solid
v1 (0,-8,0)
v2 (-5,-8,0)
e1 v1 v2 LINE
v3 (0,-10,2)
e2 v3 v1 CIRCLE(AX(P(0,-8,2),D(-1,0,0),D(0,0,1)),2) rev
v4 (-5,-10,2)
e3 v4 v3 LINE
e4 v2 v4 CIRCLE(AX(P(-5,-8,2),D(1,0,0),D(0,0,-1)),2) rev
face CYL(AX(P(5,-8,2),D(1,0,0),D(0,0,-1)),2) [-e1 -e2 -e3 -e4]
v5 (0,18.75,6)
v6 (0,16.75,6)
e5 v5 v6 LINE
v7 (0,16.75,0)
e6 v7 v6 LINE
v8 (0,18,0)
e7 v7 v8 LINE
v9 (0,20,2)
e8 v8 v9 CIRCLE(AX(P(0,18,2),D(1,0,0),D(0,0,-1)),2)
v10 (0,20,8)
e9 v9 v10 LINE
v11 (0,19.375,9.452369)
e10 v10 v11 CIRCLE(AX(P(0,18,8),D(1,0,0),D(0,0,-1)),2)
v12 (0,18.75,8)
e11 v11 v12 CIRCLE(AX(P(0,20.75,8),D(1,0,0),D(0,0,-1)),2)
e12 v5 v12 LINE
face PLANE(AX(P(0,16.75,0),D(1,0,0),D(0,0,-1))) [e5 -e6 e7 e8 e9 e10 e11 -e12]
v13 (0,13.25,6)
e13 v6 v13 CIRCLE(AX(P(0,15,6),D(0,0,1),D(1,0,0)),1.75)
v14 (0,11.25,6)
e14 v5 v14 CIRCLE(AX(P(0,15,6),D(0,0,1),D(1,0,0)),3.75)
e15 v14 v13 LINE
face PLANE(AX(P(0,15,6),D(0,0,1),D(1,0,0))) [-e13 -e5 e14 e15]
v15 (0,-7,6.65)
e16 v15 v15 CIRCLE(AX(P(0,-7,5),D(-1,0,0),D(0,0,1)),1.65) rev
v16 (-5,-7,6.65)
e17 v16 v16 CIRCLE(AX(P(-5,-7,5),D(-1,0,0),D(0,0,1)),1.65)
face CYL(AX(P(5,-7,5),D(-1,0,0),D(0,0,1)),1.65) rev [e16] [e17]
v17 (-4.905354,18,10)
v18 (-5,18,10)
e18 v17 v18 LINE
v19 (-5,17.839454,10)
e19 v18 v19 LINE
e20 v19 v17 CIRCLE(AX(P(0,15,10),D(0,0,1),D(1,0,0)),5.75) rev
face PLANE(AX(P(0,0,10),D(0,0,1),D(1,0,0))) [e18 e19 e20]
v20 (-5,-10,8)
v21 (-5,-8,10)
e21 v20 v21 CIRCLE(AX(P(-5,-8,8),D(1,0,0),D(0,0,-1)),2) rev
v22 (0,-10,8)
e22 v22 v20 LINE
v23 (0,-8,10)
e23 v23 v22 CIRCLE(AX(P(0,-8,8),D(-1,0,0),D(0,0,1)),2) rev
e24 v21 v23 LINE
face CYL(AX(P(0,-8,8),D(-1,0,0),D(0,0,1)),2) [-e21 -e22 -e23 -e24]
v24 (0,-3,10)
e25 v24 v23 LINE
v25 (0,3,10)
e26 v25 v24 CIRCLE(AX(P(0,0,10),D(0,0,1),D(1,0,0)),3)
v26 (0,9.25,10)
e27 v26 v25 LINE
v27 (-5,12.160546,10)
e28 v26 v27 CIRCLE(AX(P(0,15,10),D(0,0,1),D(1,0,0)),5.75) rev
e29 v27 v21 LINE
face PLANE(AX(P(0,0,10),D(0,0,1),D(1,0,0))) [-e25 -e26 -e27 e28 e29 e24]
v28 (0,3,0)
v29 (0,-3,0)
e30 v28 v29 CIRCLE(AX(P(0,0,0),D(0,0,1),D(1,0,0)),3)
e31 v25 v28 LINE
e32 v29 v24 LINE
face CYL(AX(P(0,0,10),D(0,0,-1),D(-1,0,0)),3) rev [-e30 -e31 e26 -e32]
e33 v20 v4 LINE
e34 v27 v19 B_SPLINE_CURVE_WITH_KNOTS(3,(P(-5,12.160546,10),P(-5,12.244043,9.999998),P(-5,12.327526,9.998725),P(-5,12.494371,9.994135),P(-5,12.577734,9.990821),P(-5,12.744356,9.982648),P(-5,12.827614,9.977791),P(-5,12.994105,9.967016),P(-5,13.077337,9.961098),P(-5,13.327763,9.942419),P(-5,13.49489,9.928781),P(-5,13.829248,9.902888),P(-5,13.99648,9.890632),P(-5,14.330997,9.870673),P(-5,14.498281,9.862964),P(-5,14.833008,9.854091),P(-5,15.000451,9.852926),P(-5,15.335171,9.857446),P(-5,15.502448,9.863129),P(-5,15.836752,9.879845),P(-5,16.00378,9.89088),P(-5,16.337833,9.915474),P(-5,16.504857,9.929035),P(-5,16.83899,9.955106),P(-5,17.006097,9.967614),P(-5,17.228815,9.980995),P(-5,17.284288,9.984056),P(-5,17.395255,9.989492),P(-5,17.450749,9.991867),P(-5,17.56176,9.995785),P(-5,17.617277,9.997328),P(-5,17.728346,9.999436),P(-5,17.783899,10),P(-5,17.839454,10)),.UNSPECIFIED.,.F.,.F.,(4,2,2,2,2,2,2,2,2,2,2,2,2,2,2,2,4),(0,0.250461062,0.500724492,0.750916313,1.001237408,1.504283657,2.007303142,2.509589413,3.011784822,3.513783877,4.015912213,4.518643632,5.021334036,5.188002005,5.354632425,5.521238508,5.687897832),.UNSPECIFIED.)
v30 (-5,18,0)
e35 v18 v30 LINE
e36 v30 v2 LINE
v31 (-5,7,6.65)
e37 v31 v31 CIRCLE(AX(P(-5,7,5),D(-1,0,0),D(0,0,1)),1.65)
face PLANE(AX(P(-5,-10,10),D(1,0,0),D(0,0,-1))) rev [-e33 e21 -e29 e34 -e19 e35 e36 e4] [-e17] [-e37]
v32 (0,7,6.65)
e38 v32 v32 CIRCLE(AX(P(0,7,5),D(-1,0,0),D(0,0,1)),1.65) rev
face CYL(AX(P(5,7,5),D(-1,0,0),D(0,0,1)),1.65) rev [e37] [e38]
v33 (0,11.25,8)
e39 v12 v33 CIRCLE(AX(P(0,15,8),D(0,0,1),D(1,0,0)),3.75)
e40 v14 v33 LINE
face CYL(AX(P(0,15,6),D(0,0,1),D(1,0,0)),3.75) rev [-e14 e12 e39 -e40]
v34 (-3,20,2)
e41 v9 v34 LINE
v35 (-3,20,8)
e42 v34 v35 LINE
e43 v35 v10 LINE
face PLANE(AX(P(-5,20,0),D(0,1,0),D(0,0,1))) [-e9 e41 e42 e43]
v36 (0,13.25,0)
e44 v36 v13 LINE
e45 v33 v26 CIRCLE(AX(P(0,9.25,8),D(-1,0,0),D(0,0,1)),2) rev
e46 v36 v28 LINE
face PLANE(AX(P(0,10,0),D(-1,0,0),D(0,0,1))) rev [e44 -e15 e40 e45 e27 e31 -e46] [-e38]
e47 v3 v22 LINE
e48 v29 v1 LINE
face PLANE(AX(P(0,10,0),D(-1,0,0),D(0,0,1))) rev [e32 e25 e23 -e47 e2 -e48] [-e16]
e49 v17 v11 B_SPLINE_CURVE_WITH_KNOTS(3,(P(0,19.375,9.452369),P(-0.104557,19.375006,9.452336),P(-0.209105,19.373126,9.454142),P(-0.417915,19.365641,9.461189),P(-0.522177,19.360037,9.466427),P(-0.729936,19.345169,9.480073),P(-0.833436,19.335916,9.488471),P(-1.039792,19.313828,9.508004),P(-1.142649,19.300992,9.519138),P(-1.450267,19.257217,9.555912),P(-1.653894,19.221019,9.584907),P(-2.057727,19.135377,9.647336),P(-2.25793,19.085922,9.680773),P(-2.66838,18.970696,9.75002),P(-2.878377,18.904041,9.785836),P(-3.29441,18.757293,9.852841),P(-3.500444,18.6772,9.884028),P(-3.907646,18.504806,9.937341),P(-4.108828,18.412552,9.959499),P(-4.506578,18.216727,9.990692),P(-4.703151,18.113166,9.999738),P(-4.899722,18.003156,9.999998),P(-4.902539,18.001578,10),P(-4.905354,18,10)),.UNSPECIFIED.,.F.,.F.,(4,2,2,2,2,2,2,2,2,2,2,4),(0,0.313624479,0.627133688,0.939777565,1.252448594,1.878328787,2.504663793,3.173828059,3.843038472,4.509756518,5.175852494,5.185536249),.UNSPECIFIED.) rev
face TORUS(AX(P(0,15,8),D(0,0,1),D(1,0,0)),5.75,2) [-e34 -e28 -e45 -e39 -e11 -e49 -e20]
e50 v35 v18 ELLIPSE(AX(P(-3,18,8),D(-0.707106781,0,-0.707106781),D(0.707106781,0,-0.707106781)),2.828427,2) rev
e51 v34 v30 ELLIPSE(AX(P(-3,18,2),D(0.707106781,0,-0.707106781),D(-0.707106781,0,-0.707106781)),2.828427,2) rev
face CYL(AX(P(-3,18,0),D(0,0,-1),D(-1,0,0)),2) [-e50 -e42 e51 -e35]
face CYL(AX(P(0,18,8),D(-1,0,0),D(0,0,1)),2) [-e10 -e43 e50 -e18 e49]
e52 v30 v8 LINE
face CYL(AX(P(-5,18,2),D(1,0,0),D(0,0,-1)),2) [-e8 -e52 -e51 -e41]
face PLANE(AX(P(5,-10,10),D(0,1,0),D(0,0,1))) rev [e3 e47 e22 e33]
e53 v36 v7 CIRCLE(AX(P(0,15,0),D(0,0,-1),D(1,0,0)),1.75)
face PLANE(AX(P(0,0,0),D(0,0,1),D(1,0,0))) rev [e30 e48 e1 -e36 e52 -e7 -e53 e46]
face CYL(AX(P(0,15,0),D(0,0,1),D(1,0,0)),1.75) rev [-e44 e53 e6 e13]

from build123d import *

# Parameters (mm, degrees)
SKETCH_1_W          = 10
SKETCH_1_H          = 20
SKETCH_1_R          = 3
EXTRUDE_1_DEPTH     = 10
SKETCH_2_R          = 1.65
CUT_EXTRUDE_1_DEPTH = 18.320508076
SKETCH_3_W          = 12.852703923
SKETCH_3_H          = 20.2795508
CUT_EXTRUDE_2_DEPTH = 16
EXTRUDE_2_DEPTH     = 10
FILLET_1_R          = 2
SKETCH_6_R          = 3.75
CUT_EXTRUDE_3_DEPTH = 4
FILLET_2_R          = 2


with BuildPart() as part:
    # 草圖1 → 填料-伸長1 (new body)
    with BuildSketch(Plane.XY):
        Rectangle(SKETCH_1_W, SKETCH_1_H)
        Circle(SKETCH_1_R, mode=Mode.SUBTRACT)
    extrude(amount=EXTRUDE_1_DEPTH)

    # 草圖2 → 除料-伸長1 (cut, through all)
    with BuildSketch(Plane.ZY.offset(5)):
        with Locations((5, 7)):
            Circle(SKETCH_2_R)
        with Locations((5, -7)):
            Circle(SKETCH_2_R)
    extrude(amount=-CUT_EXTRUDE_1_DEPTH, mode=Mode.SUBTRACT)

    # 草圖3 → 除料-伸長2 (cut, through all)
    with BuildSketch(Plane.XY.offset(10)):
        with Locations((6.426351961, -0.1397754)):
            Rectangle(SKETCH_3_W, SKETCH_3_H)
    extrude(amount=-CUT_EXTRUDE_2_DEPTH, mode=Mode.SUBTRACT)

    # 草圖5 → 填料-伸長2 (add, through all)
    with BuildSketch(Plane.XY.offset(10)):
        with BuildLine():
            Line((0, 10), (0, 13.25))
            ThreePointArc((0, 13.25), (-1.75, 15), (0, 16.75))
            Line((0, 16.75), (0, 20))
            Line((0, 20), (-5, 20))
            Line((-5, 20), (-5, 10))
            Line((-5, 10), (0, 10))
        make_face()
    extrude(amount=-EXTRUDE_2_DEPTH)

    # 圓角1
    fillet_1_edges = [part.edges().sort_by_distance(p)[0] for p in [
        (-2.5, -10, 0),
        (-2.5, 20, 0),
        (-5, 20, 5),
        (-2.5, 20, 10),
        (-2.5, -10, 10),
    ]]
    fillet(fillet_1_edges, radius=FILLET_1_R)

    # 草圖6 → 除料-伸長3 (cut)
    with BuildSketch(Plane.XY.offset(10)):
        with Locations((0, 15)):
            Circle(SKETCH_6_R)
    extrude(amount=-CUT_EXTRUDE_3_DEPTH, mode=Mode.SUBTRACT)

    # 圓角2
    # the kernel refuses this fillet: 2 mm, written as the material it takes off along each edge
    with BuildSketch(Plane(origin=(0, 15, 10), x_dir=(0.6374525530296073, 0.7704896122830182, 0), z_dir=(0.7704896122830182, -0.6374525530296073, 0))) as fillet_2_piece_1:
        with BuildLine():
            CenterArc((3.75 + FILLET_2_R, -FILLET_2_R), FILLET_2_R, 90, 90)
            Line((3.75, -FILLET_2_R), (3.75, 0))
            Line((3.75, 0), (3.75 + FILLET_2_R, 0))
        make_face()
    revolve(axis=Axis((0, 15, 10), (0, 0, 1)), revolution_arc=296.074145673, mode=Mode.SUBTRACT)


solid = part.part
